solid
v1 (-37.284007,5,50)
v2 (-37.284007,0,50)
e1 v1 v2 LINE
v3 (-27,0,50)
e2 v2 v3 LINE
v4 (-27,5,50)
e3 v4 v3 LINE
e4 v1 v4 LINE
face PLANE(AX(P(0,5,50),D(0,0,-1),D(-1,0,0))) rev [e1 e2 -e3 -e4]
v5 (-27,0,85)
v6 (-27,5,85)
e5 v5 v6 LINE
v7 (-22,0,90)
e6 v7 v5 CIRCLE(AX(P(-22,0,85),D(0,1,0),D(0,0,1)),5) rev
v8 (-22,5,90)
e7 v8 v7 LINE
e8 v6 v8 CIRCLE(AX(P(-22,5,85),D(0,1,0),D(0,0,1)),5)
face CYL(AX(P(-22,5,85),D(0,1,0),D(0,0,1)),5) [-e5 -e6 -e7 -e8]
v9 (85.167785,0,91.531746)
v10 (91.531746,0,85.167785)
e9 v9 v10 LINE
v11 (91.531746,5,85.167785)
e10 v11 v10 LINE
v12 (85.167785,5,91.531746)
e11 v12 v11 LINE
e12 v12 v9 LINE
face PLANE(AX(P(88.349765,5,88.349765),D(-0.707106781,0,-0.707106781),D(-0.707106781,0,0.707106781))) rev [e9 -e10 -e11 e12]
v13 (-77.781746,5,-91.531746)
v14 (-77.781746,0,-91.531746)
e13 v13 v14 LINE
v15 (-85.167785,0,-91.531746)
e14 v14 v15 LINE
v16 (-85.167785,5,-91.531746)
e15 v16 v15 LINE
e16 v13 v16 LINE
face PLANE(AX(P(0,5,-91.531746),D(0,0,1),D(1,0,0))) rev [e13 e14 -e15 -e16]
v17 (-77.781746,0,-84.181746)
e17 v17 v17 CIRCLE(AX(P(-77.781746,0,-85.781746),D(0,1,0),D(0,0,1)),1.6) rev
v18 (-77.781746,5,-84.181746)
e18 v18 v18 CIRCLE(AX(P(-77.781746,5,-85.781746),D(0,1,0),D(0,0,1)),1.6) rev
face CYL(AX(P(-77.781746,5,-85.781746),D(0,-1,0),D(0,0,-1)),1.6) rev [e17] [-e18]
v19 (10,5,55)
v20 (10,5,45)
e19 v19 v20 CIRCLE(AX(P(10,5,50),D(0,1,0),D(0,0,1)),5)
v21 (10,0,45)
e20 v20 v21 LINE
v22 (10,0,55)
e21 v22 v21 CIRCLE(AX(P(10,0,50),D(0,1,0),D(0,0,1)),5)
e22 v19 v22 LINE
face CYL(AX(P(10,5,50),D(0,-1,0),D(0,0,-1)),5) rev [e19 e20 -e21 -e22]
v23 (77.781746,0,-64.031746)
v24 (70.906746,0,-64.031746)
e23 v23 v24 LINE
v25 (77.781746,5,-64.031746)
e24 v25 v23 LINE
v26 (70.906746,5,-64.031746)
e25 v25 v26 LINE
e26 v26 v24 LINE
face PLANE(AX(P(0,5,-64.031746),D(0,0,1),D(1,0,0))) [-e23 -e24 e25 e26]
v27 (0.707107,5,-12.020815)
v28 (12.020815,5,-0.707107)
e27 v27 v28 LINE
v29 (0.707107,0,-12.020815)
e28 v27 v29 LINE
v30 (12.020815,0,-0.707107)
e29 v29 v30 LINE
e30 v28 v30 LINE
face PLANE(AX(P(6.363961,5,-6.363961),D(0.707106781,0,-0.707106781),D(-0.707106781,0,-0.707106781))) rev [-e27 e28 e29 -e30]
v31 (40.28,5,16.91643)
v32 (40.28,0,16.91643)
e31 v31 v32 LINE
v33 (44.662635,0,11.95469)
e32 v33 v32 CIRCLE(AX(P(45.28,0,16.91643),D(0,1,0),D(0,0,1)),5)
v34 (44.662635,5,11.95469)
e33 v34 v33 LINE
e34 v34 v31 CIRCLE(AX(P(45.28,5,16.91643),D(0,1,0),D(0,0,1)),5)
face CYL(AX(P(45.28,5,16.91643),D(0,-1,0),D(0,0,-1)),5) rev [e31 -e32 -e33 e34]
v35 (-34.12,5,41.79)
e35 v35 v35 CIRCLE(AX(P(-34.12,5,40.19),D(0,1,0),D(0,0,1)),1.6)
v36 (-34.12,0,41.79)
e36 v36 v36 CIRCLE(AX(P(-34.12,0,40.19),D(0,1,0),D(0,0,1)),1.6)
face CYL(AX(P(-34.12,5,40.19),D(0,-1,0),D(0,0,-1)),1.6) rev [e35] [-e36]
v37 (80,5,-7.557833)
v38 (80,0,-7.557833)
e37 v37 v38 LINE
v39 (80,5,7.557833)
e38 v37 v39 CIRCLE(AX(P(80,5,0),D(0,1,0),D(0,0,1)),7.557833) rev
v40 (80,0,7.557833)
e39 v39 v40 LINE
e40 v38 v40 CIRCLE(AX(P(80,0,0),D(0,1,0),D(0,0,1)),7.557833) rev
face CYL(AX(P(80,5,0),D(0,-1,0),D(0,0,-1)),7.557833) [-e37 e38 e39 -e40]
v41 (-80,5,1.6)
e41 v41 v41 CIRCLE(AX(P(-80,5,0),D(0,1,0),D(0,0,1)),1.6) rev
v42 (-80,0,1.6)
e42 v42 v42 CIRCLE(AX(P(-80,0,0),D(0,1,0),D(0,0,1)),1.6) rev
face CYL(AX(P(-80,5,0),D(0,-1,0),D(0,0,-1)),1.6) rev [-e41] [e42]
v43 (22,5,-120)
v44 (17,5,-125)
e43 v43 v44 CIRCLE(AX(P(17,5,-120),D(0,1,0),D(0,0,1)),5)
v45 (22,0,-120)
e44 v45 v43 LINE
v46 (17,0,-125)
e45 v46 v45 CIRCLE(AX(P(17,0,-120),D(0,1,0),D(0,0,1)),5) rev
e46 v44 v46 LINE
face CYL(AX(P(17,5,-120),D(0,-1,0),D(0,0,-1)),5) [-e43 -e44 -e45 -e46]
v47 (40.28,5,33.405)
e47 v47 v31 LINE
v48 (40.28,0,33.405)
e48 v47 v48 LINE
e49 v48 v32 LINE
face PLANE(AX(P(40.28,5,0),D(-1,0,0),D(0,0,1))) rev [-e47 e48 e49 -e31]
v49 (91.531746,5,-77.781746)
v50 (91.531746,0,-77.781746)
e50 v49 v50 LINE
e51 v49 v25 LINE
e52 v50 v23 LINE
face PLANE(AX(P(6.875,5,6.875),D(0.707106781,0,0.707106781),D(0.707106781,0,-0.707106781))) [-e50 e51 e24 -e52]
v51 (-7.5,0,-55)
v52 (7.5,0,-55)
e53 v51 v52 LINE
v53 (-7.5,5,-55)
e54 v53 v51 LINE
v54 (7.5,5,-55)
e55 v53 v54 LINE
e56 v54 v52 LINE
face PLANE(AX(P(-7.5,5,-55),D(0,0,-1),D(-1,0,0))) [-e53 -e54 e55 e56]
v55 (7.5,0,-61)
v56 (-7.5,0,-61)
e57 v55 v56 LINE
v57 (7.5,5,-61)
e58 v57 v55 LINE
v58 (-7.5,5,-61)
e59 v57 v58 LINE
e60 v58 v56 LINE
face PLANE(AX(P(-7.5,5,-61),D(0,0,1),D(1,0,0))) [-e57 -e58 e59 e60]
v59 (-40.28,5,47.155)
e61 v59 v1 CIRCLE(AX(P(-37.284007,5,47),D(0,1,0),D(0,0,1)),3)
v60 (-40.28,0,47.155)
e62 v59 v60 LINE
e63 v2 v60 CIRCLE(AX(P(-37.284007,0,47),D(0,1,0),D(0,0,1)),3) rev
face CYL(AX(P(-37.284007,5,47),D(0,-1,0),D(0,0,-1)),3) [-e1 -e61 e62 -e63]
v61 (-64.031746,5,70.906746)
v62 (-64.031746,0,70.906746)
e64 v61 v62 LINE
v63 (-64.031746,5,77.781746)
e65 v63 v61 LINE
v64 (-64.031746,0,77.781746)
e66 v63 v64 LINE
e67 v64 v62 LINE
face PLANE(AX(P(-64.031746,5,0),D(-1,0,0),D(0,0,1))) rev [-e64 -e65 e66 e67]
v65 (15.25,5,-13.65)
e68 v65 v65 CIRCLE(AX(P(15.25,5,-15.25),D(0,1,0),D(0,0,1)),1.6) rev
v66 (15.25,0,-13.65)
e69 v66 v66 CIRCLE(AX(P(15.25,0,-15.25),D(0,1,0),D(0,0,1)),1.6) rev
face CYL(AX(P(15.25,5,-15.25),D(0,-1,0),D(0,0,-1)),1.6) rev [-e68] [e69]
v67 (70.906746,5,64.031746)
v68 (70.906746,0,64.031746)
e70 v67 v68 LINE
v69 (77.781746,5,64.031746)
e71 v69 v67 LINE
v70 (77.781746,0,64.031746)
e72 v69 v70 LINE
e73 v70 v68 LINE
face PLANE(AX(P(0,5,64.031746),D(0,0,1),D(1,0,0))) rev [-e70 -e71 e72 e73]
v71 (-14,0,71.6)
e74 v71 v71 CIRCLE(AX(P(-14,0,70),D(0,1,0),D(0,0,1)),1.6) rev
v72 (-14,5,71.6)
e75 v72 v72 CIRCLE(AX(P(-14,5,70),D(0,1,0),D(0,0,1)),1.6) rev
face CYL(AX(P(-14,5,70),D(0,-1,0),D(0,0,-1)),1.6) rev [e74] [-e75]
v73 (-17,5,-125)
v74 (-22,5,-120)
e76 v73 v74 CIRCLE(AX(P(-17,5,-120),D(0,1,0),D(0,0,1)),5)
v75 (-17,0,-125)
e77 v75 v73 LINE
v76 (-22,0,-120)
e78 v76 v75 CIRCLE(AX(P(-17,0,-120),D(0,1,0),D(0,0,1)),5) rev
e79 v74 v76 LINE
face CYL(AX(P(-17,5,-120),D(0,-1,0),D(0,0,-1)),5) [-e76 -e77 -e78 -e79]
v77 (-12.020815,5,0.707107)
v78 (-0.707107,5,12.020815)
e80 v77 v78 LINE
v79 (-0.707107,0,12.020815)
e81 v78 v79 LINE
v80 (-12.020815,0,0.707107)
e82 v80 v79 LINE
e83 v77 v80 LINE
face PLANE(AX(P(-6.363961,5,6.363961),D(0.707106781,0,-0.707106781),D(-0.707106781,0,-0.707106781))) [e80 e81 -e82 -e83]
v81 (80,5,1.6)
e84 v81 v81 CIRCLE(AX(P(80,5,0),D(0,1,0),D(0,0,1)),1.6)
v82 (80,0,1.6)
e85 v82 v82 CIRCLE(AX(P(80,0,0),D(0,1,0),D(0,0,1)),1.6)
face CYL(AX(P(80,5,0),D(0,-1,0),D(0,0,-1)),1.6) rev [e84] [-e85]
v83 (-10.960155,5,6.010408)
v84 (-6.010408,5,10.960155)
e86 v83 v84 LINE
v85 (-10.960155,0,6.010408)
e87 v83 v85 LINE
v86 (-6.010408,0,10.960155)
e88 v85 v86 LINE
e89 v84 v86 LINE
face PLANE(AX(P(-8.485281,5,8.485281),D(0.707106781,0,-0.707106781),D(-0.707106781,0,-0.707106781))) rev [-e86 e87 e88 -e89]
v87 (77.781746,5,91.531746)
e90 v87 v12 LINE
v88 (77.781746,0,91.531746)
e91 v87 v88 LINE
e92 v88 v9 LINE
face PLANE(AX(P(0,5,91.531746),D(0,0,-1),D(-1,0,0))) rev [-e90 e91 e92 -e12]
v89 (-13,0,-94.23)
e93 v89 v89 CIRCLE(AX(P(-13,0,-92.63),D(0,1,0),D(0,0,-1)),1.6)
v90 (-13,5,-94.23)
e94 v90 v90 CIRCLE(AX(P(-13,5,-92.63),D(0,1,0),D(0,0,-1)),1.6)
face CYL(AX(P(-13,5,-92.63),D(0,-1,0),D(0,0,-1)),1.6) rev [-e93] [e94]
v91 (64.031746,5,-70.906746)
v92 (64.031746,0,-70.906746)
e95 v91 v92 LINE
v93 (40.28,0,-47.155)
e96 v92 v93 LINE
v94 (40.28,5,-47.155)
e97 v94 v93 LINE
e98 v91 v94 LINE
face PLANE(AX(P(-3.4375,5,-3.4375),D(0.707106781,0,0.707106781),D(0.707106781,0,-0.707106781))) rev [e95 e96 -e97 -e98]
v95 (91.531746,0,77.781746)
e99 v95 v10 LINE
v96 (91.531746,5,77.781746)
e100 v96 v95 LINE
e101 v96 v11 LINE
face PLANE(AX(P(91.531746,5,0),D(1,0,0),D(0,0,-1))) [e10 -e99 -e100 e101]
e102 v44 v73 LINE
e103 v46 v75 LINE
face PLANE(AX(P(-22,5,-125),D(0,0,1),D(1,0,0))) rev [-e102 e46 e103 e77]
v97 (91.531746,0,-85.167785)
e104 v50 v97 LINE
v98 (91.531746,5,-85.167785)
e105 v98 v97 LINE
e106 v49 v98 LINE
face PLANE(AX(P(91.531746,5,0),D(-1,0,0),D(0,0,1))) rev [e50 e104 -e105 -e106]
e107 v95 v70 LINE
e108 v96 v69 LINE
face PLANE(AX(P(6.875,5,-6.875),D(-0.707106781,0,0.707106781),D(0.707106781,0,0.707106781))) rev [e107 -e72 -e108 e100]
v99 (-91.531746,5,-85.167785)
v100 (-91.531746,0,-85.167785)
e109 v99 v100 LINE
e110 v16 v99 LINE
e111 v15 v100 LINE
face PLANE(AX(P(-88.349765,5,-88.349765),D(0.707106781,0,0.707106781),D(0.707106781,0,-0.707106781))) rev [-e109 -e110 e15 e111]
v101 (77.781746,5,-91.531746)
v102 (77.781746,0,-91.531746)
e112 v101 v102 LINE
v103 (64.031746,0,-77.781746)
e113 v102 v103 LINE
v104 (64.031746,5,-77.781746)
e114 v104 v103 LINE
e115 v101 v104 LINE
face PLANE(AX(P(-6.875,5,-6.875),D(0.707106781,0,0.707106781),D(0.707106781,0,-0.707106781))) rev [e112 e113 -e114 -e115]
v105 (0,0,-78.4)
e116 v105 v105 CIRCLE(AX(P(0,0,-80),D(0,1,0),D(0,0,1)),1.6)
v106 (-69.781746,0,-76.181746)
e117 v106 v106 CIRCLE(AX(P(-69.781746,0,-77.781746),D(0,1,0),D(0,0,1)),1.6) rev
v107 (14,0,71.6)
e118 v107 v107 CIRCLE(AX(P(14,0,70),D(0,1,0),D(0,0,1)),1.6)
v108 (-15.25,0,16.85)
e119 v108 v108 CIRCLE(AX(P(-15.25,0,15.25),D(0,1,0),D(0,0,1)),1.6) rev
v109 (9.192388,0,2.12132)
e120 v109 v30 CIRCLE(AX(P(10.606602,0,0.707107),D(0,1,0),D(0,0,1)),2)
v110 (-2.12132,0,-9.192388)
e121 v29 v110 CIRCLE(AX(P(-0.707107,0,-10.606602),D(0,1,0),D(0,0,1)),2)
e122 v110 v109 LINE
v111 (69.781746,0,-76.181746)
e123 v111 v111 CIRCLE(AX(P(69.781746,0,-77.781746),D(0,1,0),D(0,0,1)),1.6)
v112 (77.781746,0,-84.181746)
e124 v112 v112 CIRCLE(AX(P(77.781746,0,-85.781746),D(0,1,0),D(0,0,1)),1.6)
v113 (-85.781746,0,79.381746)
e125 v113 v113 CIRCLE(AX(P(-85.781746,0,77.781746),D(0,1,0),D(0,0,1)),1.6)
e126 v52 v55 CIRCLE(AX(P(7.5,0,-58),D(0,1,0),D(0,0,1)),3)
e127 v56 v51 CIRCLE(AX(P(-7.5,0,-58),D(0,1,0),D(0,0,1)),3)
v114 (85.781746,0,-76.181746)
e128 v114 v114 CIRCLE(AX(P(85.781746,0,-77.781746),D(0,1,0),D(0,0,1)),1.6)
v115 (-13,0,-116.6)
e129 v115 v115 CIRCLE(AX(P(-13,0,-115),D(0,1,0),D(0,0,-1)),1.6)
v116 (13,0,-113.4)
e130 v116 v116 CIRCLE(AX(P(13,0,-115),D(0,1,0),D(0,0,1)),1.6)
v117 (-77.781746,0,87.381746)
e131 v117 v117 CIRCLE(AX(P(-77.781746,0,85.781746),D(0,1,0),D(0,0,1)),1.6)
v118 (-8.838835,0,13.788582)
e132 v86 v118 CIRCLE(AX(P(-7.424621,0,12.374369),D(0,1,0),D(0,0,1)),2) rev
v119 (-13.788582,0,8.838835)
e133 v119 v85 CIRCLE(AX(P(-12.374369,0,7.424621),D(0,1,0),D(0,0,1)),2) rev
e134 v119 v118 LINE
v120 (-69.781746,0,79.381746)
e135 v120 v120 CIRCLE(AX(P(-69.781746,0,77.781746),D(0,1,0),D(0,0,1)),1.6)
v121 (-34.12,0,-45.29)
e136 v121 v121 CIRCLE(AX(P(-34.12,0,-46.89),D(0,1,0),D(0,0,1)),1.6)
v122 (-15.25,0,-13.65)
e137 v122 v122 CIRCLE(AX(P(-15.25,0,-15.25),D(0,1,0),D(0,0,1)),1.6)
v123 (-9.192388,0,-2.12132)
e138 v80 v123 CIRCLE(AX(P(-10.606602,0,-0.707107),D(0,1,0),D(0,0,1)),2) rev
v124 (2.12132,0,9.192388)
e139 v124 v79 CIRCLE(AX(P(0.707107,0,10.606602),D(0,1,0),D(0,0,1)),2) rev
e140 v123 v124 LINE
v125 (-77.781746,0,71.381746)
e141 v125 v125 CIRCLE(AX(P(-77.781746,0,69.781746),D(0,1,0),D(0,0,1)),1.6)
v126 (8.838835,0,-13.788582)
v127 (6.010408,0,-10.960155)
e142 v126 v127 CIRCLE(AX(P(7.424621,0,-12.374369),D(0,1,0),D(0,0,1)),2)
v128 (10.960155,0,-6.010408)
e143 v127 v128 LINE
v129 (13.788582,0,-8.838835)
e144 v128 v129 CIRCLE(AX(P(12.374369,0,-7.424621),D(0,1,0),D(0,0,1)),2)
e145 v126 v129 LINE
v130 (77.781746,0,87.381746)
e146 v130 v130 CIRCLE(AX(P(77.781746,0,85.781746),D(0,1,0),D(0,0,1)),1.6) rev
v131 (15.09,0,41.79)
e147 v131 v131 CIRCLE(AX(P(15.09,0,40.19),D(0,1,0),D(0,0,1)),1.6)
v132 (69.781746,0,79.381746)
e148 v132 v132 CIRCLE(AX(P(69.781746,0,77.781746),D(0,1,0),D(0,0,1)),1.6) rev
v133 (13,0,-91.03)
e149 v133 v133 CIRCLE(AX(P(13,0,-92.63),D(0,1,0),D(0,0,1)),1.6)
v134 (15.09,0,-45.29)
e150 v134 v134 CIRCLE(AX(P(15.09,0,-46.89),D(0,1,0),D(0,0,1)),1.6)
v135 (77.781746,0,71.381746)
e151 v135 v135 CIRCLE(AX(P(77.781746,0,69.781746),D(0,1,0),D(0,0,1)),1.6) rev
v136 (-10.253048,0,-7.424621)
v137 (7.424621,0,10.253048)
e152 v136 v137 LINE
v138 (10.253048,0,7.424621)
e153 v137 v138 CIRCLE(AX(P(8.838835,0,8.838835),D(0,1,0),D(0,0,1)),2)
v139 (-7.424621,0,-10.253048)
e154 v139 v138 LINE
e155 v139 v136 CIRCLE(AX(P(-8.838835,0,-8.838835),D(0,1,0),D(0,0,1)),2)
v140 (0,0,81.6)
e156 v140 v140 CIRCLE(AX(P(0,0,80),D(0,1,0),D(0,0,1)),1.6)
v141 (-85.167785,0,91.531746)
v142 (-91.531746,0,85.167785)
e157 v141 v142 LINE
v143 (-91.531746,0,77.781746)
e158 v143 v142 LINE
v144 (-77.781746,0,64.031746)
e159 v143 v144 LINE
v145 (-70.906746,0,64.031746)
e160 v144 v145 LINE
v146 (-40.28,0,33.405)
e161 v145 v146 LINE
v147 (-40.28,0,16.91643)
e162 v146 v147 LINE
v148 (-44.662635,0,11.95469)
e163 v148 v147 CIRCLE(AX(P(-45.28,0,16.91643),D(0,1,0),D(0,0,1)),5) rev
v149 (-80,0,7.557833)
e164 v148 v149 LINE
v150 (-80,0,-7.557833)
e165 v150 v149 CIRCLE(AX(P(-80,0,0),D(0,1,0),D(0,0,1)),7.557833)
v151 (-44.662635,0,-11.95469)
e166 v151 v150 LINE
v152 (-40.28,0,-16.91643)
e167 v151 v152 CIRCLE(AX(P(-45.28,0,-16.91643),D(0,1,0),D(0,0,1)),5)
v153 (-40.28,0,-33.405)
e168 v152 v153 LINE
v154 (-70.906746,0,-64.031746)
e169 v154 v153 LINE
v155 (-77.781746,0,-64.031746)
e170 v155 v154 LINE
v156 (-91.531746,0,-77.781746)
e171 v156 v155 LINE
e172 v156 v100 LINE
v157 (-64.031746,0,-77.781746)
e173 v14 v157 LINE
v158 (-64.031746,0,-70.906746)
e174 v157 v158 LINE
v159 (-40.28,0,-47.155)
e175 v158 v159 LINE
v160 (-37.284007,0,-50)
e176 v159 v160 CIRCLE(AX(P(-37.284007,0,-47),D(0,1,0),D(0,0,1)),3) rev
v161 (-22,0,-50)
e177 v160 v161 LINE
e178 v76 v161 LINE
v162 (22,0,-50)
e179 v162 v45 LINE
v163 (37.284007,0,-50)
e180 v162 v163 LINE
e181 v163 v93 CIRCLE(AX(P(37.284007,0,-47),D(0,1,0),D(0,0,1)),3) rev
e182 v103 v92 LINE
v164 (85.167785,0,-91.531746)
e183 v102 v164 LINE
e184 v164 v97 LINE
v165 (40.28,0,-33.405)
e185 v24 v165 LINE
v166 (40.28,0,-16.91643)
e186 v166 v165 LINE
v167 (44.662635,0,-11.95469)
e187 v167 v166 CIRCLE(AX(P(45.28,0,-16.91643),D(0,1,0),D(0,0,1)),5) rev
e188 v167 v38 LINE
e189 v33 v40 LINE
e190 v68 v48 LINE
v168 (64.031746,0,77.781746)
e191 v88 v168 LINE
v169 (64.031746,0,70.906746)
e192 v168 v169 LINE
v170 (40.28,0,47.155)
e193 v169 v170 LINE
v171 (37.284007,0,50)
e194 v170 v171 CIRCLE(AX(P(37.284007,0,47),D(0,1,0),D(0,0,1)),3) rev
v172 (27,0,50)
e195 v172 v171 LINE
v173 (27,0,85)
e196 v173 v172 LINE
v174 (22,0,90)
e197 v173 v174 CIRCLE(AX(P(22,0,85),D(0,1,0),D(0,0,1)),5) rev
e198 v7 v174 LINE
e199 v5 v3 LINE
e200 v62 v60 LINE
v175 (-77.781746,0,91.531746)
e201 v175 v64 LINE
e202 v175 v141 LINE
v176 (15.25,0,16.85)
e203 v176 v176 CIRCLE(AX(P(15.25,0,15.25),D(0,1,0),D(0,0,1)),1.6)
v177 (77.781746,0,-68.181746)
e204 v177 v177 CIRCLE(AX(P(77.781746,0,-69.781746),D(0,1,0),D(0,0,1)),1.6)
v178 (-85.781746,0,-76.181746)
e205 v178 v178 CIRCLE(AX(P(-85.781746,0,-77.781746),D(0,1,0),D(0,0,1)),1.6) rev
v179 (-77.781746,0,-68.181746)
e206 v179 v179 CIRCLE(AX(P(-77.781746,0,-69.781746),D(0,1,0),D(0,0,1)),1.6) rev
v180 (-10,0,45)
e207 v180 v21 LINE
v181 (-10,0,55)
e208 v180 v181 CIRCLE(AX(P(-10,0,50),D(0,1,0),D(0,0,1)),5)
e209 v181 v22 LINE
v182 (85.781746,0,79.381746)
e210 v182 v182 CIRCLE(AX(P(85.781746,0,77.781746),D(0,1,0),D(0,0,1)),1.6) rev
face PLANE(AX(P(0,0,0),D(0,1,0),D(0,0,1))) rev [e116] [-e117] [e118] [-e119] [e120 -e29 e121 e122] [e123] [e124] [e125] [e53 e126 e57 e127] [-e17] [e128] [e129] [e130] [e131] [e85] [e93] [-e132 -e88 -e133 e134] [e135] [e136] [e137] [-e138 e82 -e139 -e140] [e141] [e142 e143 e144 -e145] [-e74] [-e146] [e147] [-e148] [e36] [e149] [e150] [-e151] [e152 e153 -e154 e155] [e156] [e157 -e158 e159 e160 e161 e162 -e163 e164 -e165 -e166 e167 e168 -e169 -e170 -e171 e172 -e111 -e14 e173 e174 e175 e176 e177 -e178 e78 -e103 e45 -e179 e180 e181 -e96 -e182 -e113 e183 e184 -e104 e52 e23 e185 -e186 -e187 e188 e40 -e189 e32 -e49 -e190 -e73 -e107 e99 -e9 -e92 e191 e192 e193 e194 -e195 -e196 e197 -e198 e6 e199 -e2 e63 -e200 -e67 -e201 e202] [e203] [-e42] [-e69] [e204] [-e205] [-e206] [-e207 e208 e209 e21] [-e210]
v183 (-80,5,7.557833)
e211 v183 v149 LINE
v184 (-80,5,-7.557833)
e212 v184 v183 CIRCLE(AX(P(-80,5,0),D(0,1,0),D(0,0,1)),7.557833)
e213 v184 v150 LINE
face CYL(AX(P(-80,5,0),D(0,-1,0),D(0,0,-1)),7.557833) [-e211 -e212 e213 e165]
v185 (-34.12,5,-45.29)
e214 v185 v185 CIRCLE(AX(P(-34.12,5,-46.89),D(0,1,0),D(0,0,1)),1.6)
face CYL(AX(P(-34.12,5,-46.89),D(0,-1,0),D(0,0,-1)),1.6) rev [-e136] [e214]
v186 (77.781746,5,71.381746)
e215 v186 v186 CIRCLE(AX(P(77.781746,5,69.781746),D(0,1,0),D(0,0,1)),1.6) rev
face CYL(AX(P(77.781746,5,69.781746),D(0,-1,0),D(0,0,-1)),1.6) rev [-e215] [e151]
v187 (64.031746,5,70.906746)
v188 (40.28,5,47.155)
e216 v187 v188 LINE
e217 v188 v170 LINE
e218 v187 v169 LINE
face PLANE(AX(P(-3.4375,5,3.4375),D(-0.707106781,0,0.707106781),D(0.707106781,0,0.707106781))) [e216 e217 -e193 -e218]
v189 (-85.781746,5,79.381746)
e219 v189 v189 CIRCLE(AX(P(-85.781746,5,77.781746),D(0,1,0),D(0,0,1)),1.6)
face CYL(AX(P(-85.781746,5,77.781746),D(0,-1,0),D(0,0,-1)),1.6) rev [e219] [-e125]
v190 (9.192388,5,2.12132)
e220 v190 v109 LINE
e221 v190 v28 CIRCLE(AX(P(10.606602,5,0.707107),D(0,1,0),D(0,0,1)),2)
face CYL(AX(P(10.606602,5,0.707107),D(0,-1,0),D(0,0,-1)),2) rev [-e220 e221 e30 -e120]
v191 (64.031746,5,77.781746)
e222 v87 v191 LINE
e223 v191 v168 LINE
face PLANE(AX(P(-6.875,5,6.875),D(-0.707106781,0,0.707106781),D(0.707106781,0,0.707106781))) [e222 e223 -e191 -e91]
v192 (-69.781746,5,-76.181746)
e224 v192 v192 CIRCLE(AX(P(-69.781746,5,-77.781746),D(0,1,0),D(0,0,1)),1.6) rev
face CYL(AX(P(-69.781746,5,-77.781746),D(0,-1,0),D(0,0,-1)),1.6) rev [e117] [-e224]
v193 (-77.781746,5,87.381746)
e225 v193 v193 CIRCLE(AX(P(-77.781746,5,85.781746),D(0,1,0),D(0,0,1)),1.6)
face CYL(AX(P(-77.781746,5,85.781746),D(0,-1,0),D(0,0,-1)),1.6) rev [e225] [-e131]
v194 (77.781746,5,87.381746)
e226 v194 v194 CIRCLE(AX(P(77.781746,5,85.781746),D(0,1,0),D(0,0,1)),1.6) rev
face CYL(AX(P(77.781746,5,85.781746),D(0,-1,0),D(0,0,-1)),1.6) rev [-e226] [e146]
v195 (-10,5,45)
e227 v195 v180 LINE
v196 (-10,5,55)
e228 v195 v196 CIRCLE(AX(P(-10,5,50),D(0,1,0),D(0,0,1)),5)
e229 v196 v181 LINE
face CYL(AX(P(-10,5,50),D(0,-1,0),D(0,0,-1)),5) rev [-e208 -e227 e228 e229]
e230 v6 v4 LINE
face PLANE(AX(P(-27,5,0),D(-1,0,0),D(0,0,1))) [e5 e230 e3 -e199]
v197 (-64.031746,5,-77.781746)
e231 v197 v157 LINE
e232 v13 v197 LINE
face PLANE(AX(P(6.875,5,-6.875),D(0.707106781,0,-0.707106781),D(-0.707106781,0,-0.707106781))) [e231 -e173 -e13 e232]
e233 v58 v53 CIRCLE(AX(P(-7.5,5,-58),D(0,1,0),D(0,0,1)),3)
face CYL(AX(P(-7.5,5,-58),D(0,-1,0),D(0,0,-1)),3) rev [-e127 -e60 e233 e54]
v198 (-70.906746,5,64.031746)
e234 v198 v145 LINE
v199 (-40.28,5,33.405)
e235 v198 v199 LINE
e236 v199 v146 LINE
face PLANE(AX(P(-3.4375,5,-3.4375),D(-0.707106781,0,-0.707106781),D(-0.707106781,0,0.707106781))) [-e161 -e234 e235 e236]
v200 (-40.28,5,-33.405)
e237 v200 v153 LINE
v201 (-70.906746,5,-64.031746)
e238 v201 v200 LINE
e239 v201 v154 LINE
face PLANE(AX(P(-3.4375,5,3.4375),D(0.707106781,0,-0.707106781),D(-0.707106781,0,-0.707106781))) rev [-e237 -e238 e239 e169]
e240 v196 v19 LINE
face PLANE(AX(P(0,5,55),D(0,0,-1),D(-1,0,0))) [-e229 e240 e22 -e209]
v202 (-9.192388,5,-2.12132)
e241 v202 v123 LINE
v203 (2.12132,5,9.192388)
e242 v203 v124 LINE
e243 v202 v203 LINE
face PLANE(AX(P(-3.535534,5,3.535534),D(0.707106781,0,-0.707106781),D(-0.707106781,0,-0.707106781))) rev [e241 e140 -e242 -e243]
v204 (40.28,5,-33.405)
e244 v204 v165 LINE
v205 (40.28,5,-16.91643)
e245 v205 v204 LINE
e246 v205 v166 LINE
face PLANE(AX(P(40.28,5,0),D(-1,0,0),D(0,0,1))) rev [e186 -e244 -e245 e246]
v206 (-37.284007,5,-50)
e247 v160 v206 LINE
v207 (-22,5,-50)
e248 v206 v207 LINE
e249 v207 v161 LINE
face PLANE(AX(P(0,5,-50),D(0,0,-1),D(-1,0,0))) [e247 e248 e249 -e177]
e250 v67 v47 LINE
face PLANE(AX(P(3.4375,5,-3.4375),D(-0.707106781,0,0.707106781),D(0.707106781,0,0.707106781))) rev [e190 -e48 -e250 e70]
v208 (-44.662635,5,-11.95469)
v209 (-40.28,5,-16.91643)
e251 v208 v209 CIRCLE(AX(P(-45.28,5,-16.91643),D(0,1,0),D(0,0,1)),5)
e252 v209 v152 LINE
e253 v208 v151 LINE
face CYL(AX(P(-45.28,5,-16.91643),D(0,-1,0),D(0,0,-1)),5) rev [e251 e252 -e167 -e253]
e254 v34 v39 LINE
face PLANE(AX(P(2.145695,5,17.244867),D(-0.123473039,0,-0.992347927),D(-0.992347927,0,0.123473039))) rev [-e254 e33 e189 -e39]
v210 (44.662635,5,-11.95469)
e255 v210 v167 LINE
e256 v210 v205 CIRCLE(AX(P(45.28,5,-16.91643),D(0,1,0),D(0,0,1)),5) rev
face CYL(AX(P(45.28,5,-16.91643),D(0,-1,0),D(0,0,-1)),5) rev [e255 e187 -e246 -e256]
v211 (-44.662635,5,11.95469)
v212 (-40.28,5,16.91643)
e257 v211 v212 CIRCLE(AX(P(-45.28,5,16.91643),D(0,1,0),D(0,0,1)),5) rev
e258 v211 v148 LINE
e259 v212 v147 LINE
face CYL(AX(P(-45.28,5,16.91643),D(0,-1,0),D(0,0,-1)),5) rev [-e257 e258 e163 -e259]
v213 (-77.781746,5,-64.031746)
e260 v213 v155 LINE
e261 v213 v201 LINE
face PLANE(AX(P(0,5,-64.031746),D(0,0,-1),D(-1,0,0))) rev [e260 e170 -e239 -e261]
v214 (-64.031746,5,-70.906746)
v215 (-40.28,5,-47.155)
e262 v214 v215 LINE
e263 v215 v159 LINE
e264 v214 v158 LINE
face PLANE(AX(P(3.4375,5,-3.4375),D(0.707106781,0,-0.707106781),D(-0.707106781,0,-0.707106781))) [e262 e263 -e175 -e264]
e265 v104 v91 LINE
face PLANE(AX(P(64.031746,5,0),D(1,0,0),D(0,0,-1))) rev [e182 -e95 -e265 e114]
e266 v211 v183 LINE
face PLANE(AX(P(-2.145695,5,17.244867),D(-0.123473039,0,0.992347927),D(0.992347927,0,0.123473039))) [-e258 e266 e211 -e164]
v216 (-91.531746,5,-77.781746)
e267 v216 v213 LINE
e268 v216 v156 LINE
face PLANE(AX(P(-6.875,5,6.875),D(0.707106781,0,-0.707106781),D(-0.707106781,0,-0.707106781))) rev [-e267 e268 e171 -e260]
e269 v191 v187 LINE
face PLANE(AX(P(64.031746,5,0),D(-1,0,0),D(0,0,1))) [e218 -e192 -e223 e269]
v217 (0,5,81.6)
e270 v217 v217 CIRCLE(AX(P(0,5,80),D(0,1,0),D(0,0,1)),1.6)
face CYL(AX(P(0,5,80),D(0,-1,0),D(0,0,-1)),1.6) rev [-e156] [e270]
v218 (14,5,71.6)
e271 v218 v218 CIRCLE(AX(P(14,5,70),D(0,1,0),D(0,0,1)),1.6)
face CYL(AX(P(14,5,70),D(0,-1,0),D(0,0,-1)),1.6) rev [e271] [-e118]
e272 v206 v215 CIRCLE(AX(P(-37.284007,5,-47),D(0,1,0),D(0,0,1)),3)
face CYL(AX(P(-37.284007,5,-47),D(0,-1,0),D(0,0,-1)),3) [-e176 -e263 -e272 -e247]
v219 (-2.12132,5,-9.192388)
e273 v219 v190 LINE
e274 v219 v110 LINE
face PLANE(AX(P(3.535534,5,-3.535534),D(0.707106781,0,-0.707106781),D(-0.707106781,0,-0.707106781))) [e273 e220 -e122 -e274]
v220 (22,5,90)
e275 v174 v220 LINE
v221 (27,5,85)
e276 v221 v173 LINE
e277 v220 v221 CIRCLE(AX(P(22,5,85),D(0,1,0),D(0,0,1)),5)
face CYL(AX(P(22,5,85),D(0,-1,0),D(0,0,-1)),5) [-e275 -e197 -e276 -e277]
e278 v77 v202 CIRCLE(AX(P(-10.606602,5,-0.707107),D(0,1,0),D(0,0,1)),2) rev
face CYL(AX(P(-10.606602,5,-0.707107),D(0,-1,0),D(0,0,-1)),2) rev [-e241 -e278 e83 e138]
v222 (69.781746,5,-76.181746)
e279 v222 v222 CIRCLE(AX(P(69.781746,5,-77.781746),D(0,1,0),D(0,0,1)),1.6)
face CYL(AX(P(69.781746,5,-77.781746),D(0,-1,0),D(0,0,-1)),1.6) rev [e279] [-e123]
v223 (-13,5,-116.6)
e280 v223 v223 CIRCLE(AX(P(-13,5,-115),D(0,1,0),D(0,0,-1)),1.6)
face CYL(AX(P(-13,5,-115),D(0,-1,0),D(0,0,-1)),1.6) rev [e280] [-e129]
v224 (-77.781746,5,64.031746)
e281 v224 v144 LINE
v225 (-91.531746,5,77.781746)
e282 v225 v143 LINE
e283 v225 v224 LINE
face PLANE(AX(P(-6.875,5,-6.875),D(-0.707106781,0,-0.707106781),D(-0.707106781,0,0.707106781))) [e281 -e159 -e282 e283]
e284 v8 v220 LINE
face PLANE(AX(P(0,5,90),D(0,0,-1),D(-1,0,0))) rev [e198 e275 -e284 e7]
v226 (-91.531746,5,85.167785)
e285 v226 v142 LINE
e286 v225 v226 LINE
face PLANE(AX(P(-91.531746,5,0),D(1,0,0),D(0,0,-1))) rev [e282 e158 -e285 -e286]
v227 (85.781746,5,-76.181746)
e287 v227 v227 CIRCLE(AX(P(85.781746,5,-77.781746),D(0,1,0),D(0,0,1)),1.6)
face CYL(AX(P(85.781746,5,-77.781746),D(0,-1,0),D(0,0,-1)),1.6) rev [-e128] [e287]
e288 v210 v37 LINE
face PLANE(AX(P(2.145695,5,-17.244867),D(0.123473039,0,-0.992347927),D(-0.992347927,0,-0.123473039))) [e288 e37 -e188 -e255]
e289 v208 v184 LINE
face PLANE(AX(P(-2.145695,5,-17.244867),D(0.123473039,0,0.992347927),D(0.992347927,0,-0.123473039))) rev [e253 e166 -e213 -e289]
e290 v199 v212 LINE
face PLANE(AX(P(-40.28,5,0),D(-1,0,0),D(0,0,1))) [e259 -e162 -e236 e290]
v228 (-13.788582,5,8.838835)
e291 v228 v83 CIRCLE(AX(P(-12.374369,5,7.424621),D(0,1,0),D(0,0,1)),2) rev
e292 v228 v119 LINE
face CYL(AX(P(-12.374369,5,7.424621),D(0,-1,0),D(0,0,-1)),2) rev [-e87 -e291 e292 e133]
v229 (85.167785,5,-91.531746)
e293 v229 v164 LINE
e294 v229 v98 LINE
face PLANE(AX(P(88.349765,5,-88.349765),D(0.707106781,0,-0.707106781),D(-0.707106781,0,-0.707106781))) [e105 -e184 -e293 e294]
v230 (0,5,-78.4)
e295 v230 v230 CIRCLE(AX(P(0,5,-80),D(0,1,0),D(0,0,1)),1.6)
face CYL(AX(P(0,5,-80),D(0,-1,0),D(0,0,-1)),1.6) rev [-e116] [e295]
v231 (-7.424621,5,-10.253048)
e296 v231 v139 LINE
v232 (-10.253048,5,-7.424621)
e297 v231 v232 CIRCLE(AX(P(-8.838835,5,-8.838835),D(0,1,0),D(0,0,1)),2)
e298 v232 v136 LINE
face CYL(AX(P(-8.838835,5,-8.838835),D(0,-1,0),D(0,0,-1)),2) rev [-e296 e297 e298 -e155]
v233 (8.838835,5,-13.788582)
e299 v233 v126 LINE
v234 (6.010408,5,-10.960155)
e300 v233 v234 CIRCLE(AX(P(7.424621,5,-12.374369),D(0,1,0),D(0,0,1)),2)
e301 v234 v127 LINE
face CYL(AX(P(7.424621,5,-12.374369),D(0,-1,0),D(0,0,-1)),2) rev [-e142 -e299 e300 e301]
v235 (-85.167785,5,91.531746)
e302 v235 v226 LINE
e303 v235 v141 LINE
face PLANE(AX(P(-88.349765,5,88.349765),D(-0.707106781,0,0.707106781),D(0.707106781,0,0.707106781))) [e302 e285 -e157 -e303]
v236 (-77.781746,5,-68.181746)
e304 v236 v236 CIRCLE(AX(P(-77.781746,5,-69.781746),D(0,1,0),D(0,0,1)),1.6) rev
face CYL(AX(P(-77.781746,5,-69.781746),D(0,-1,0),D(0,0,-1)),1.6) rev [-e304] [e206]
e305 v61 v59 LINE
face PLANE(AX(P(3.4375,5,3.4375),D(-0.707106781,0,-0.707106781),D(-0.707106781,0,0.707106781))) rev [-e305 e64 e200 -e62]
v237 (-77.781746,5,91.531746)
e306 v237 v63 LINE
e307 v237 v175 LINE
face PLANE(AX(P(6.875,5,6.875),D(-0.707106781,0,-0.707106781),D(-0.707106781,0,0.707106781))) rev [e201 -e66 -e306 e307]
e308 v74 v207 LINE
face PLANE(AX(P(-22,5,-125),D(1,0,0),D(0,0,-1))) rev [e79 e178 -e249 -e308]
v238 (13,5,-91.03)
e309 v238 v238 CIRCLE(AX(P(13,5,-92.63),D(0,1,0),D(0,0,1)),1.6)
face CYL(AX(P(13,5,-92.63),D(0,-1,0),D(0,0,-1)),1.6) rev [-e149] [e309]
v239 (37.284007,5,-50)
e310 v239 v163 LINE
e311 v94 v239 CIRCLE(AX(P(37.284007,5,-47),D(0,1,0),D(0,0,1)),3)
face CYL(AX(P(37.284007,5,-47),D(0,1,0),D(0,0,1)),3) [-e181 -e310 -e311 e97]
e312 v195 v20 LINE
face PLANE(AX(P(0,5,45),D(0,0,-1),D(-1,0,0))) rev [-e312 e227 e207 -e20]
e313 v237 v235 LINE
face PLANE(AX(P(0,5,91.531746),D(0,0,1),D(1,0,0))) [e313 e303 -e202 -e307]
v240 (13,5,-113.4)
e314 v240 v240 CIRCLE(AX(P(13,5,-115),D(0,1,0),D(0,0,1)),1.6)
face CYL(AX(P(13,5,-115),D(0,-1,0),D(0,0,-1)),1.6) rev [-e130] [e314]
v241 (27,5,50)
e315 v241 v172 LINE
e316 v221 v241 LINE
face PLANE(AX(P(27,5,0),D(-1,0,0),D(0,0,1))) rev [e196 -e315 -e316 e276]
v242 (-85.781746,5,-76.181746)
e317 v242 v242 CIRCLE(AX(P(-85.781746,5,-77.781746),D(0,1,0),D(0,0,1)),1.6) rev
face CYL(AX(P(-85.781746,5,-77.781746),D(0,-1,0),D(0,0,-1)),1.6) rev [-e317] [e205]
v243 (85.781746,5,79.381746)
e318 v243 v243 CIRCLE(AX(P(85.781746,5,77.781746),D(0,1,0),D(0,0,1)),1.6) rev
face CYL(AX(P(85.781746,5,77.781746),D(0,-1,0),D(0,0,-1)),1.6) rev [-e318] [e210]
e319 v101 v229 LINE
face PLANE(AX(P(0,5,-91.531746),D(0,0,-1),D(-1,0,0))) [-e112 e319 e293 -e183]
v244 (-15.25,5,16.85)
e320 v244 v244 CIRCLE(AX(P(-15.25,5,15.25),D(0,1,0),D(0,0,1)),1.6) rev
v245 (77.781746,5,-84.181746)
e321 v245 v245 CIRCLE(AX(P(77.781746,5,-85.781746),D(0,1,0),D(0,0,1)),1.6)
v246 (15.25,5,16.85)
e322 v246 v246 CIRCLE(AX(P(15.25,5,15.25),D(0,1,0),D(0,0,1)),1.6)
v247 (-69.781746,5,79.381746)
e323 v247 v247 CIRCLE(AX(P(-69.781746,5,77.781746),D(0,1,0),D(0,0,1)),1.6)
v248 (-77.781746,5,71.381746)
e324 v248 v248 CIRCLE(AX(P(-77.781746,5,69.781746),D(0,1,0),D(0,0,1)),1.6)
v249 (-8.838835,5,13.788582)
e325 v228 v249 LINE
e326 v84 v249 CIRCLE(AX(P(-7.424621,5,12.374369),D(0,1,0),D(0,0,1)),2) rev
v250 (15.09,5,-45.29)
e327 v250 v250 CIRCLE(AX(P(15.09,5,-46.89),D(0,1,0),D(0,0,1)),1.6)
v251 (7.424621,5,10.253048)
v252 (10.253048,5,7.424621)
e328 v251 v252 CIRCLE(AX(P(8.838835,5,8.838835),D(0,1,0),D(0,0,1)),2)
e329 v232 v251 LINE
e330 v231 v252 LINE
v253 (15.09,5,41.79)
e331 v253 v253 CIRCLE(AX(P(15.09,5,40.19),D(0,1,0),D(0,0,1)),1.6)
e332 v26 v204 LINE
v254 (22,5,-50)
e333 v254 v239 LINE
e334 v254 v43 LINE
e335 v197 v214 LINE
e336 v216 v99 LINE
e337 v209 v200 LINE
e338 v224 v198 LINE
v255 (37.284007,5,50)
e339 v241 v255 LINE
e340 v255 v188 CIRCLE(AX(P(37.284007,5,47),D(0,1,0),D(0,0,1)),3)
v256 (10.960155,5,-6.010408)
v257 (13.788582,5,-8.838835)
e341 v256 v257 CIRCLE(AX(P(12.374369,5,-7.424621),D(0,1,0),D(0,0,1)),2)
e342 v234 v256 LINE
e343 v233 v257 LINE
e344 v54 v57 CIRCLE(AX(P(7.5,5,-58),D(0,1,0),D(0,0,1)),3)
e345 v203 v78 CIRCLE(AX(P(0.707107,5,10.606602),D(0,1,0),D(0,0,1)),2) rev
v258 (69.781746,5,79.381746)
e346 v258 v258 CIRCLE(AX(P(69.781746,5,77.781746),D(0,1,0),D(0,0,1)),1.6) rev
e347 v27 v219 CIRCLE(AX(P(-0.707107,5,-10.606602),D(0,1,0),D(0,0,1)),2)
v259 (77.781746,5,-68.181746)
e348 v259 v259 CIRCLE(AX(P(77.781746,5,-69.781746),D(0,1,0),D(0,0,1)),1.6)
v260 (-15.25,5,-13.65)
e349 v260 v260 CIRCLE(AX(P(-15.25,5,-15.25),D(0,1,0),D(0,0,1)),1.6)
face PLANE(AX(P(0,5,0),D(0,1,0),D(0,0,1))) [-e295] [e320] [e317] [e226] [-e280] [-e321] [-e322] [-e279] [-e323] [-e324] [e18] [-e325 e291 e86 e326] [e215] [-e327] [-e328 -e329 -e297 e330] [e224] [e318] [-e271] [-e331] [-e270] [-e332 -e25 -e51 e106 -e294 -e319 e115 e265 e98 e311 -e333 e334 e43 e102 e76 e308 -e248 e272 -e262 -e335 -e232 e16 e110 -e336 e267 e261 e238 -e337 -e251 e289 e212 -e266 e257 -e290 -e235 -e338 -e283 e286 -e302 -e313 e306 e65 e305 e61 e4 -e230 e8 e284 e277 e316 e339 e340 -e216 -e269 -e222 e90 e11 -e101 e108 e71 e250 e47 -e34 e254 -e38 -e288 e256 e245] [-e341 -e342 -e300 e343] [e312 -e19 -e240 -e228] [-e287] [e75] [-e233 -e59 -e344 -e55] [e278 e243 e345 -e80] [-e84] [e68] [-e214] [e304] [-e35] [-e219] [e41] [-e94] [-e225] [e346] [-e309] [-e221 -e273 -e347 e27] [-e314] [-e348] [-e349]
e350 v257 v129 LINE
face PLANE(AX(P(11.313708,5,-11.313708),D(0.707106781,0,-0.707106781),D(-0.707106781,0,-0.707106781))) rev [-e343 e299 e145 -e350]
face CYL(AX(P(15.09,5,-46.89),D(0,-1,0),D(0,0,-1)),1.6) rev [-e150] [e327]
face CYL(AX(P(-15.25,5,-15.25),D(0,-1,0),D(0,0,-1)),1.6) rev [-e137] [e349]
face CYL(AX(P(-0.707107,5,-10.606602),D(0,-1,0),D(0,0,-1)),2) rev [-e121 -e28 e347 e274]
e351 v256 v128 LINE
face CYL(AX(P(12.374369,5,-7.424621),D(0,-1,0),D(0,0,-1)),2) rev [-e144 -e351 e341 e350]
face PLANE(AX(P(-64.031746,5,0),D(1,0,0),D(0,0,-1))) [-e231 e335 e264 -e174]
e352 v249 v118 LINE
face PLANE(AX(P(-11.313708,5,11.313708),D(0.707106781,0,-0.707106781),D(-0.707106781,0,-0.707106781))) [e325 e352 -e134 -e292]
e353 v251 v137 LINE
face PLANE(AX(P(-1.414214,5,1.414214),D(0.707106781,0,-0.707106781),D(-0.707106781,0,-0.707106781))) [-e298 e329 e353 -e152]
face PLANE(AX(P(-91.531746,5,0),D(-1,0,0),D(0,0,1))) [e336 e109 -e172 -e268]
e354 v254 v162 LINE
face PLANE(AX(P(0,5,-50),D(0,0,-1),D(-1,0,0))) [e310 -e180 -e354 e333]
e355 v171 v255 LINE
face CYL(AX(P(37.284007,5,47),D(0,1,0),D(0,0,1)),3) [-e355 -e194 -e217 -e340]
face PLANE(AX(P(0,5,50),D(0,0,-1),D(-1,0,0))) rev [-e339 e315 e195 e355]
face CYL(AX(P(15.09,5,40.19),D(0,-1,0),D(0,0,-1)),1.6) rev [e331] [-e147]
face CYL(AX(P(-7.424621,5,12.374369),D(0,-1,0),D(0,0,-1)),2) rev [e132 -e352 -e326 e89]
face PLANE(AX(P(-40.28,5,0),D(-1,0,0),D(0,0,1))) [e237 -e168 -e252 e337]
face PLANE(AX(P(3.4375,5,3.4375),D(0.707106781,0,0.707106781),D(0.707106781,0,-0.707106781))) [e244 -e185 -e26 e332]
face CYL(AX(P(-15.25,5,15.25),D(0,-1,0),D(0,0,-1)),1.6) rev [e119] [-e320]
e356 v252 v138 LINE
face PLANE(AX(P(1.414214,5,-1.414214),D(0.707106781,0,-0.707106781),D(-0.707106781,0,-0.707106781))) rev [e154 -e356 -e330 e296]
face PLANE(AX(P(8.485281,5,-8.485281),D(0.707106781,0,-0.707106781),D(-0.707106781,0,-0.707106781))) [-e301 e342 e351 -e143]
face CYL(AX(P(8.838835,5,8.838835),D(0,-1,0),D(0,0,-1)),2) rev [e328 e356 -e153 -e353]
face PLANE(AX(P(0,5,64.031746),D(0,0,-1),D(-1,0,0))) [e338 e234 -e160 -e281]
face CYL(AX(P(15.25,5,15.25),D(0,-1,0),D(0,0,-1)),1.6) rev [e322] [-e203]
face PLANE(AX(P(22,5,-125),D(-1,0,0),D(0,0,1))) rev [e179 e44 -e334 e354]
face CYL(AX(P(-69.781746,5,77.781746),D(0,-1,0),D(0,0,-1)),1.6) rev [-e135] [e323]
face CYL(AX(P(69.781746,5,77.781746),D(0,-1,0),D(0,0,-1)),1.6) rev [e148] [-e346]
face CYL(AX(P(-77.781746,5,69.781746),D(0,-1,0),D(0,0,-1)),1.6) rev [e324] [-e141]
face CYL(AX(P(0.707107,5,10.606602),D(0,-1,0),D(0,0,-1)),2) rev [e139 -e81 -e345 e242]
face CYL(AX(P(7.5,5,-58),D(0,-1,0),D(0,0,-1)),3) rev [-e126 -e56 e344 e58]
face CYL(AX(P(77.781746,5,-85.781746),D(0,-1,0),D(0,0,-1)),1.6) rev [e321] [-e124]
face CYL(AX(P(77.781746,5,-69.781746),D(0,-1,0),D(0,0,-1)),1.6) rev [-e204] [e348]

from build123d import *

# Parameters (mm, degrees)
SKETCH_1_R          = 1.6
EXTRUDE_1_DEPTH     = 5
SKETCH_6_R          = 1.6
EXTRUDE_3_DEPTH     = 5
SKETCH_7_R          = 1.6
CUT_EXTRUDE_5_DEPTH = 130.541966274
SKETCH_8_W          = 44
SKETCH_8_H          = 75
SKETCH_8_R          = 1.6
EXTRUDE_4_DEPTH     = 5
FILLET_1_R          = 5
FILLET_2_R          = 3


with BuildPart() as part:
    # 草图1 → 凸台-拉伸1 (new body)
    with BuildSketch(Plane(origin=(0, 0, 0), x_dir=(1, 0, 0), z_dir=(0, 1, 0))):
        with BuildLine():
            Line((-40.28, -16.916429648), (-40.28, -50))
            Line((-40.28, -50), (-27, -50))
            Line((-27, -50), (-27, -90))
            Line((-27, -90), (27, -90))
            Line((27, -90), (27, -50))
            Line((27, -50), (40.28, -50))
            Line((40.28, -50), (40.28, -16.916429648))
            ThreePointArc((40.28, -16.916429648), (41.5325458, -13.606356081), (44.662634807, -11.954690012))
            Line((44.662634807, -11.954690012), (80, -7.557833088))
            ThreePointArc((80, -7.557833088), (87.557833088, 0), (80, 7.557833088))
            Line((80, 7.557833088), (44.662634807, 11.954690012))
            ThreePointArc((44.662634807, 11.954690012), (41.5325458, 13.606356081), (40.28, 16.916429648))
            Line((40.28, 16.916429648), (40.28, 50))
            Line((40.28, 50), (-40.28, 50))
            Line((-40.28, 50), (-40.28, 16.916429648))
            ThreePointArc((-40.28, 16.916429648), (-41.5325458, 13.606356081), (-44.662634807, 11.954690012))
            Line((-44.662634807, 11.954690012), (-80, 7.557833088))
            ThreePointArc((-80, 7.557833088), (-87.557833088, 0), (-80, -7.557833088))
            Line((-80, -7.557833088), (-44.662634807, -11.954690012))
            ThreePointArc((-44.662634807, -11.954690012), (-41.5325458, -13.606356081), (-40.28, -16.916429648))
        make_face()
        with Locations(Location((-34.12, -40.19, 0), (0, 0, 270))):
            Circle(SKETCH_1_R, mode=Mode.SUBTRACT)
        with Locations(Location((15.09, -40.19, 0), (0, 0, 270))):
            Circle(SKETCH_1_R, mode=Mode.SUBTRACT)
        with Locations(Location((-80, 0, 0), (0, 0, 270))):
            Circle(SKETCH_1_R, mode=Mode.SUBTRACT)
        with Locations(Location((-15.25, -15.25, 0), (0, 0, 270))):
            Circle(SKETCH_1_R, mode=Mode.SUBTRACT)
        with Locations(Location((-15.25, 15.25, 0), (0, 0, 270))):
            Circle(SKETCH_1_R, mode=Mode.SUBTRACT)
        with Locations(Location((-34.12, 46.89, 0), (0, 0, 270))):
            Circle(SKETCH_1_R, mode=Mode.SUBTRACT)
        with Locations(Location((15.25, -15.25, 0), (0, 0, 270))):
            Circle(SKETCH_1_R, mode=Mode.SUBTRACT)
        with Locations(Location((80, 0, 0), (0, 0, 270))):
            Circle(SKETCH_1_R, mode=Mode.SUBTRACT)
        with Locations(Location((15.25, 15.25, 0), (0, 0, 270))):
            Circle(SKETCH_1_R, mode=Mode.SUBTRACT)
        with Locations(Location((15.09, 46.89, 0), (0, 0, 270))):
            Circle(SKETCH_1_R, mode=Mode.SUBTRACT)
        with Locations(Location((14, -70, 0), (0, 0, 270))):
            Circle(SKETCH_1_R, mode=Mode.SUBTRACT)
        with Locations(Location((-14, -70, 0), (0, 0, 270))):
            Circle(SKETCH_1_R, mode=Mode.SUBTRACT)
    extrude(amount=EXTRUDE_1_DEPTH)

    # 草图6 → 凸台-拉伸3 (add)
    # profile 1 of 4: a face of its own
    with BuildSketch(Plane(origin=(0, 0, 0), x_dir=(1, 0, 0), z_dir=(0, 1, 0))):
        Polygon((-40.28, 33.405), (-40.28, 47.155), (-64.031745931, 70.906745931), (-64.031745931, 77.781745931), (-77.781745931, 91.531745931), (-85.1677849, 91.531745931), (-91.531745931, 85.1677849), (-91.531745931, 77.781745931), (-77.781745931, 64.031745931), (-70.906745931, 64.031745931), align=None)
        with Locations(Location((-85.781745931, 77.781745931, 0), (0, 0, 270))):
            Circle(SKETCH_6_R, mode=Mode.SUBTRACT)
        with Locations(Location((-77.781745931, 69.781745931, 0), (0, 0, 270))):
            Circle(SKETCH_6_R, mode=Mode.SUBTRACT)
        with Locations(Location((-69.781745931, 77.781745931, 0), (0, 0, 270))):
            Circle(SKETCH_6_R, mode=Mode.SUBTRACT)
        with Locations(Location((-77.781745931, 85.781745931, 0), (0, 0, 270))):
            Circle(SKETCH_6_R, mode=Mode.SUBTRACT)
    # profile 2 of 4: a face of its own
    with BuildSketch(Plane(origin=(0, 0, 0), x_dir=(1, 0, 0), z_dir=(0, 1, 0))):
        Polygon((85.1677849, 91.531745931), (77.781745931, 91.531745931), (64.031745931, 77.781745931), (64.031745931, 70.906745931), (40.28, 47.155), (40.28, 33.405), (70.906745931, 64.031745931), (77.781745931, 64.031745931), (91.531745931, 77.781745931), (91.531745931, 85.1677849), align=None)
        with Locations(Location((77.781745931, 69.781745931, 0), (0, 0, 270))):
            Circle(SKETCH_6_R, mode=Mode.SUBTRACT)
        with Locations(Location((69.781745931, 77.781745931, 0), (0, 0, 270))):
            Circle(SKETCH_6_R, mode=Mode.SUBTRACT)
        with Locations(Location((85.781745931, 77.781745931, 0), (0, 0, 270))):
            Circle(SKETCH_6_R, mode=Mode.SUBTRACT)
        with Locations(Location((77.781745931, 85.781745931, 0), (0, 0, 270))):
            Circle(SKETCH_6_R, mode=Mode.SUBTRACT)
    # profile 3 of 4: a face of its own
    with BuildSketch(Plane(origin=(0, 0, 0), x_dir=(1, 0, 0), z_dir=(0, 1, 0))):
        Polygon((70.906745931, -64.031745931), (40.28, -33.405), (40.28, -47.155), (64.031745931, -70.906745931), (64.031745931, -77.781745931), (77.781745931, -91.531745931), (85.1677849, -91.531745931), (91.531745931, -85.1677849), (91.531745931, -77.781745931), (77.781745931, -64.031745931), align=None)
        with Locations(Location((77.781745931, -85.781745931, 0), (0, 0, 270))):
            Circle(SKETCH_6_R, mode=Mode.SUBTRACT)
        with Locations(Location((69.781745931, -77.781745931, 0), (0, 0, 270))):
            Circle(SKETCH_6_R, mode=Mode.SUBTRACT)
        with Locations(Location((77.781745931, -69.781745931, 0), (0, 0, 270))):
            Circle(SKETCH_6_R, mode=Mode.SUBTRACT)
        with Locations(Location((85.781745931, -77.781745931, 0), (0, 0, 270))):
            Circle(SKETCH_6_R, mode=Mode.SUBTRACT)
    # profile 4 of 4: a face of its own
    with BuildSketch(Plane(origin=(0, 0, 0), x_dir=(1, 0, 0), z_dir=(0, 1, 0))):
        Polygon((-40.28, -47.155), (-40.28, -33.405), (-70.906745931, -64.031745931), (-77.781745931, -64.031745931), (-91.531745931, -77.781745931), (-91.531745931, -85.1677849), (-85.1677849, -91.531745931), (-77.781745931, -91.531745931), (-64.031745931, -77.781745931), (-64.031745931, -70.906745931), align=None)
        with Locations(Location((-77.781745931, -85.781745931, 0), (0, 0, 270))):
            Circle(SKETCH_6_R, mode=Mode.SUBTRACT)
        with Locations(Location((-85.781745931, -77.781745931, 0), (0, 0, 270))):
            Circle(SKETCH_6_R, mode=Mode.SUBTRACT)
        with Locations(Location((-69.781745931, -77.781745931, 0), (0, 0, 270))):
            Circle(SKETCH_6_R, mode=Mode.SUBTRACT)
        with Locations(Location((-77.781745931, -69.781745931, 0), (0, 0, 270))):
            Circle(SKETCH_6_R, mode=Mode.SUBTRACT)
    extrude(amount=EXTRUDE_3_DEPTH)

    # 草图7 → 切除-拉伸5 (cut, through all)
    with BuildSketch(Plane(origin=(0, 0, 0), x_dir=(1, 0, 0), z_dir=(0, 1, 0))):
        with BuildLine():
            ThreePointArc((-6.01040764, -10.960155108), (-6.01040764, -13.788582233), (-8.838834765, -13.788582233))
            Line((-8.838834765, -13.788582233), (-13.788582233, -8.838834765))
            ThreePointArc((-13.788582233, -8.838834765), (-13.788582233, -6.01040764), (-10.960155108, -6.01040764))
            Line((-10.960155108, -6.01040764), (-6.01040764, -10.960155108))
        make_face()
        with BuildLine():
            ThreePointArc((2.121320344, -9.192388155), (2.121320344, -12.02081528), (-0.707106781, -12.02081528))
            Line((-0.707106781, -12.02081528), (-12.02081528, -0.707106781))
            ThreePointArc((-12.02081528, -0.707106781), (-12.02081528, 2.121320344), (-9.192388155, 2.121320344))
            Line((-9.192388155, 2.121320344), (2.121320344, -9.192388155))
        make_face()
        with BuildLine():
            Line((-10.253048327, 7.424621202), (7.424621202, -10.253048327))
            ThreePointArc((7.424621202, -10.253048327), (10.253048327, -10.253048327), (10.253048327, -7.424621202))
            Line((10.253048327, -7.424621202), (-7.424621202, 10.253048327))
            ThreePointArc((-7.424621202, 10.253048327), (-10.253048327, 10.253048327), (-10.253048327, 7.424621202))
        make_face()
        with BuildLine():
            Line((-2.121320344, 9.192388155), (9.192388155, -2.121320344))
            ThreePointArc((9.192388155, -2.121320344), (12.02081528, -2.121320344), (12.02081528, 0.707106781))
            Line((12.02081528, 0.707106781), (0.707106781, 12.02081528))
            ThreePointArc((0.707106781, 12.02081528), (-2.121320344, 12.02081528), (-2.121320344, 9.192388155))
        make_face()
        with BuildLine():
            Line((6.01040764, 10.960155108), (10.960155108, 6.01040764))
            ThreePointArc((10.960155108, 6.01040764), (13.788582233, 6.01040764), (13.788582233, 8.838834765))
            Line((13.788582233, 8.838834765), (8.838834765, 13.788582233))
            ThreePointArc((8.838834765, 13.788582233), (6.01040764, 13.788582233), (6.01040764, 10.960155108))
        make_face()
        with BuildLine():
            Line((-10, -55), (10, -55))
            ThreePointArc((10, -55), (15, -50), (10, -45))
            Line((10, -45), (-10, -45))
            ThreePointArc((-10, -45), (-15, -50), (-10, -55))
        make_face()
        with Locations(Location((0, -80, 0), (0, 0, 270))):
            Circle(SKETCH_7_R)
    extrude(amount=CUT_EXTRUDE_5_DEPTH, mode=Mode.SUBTRACT)

    # 草图8 → 凸台-拉伸4 (add)
    with BuildSketch(Plane(origin=(0, 0, 0), x_dir=(1, 0, 0), z_dir=(0, 1, 0))):
        with Locations((0, 87.5)):
            Rectangle(SKETCH_8_W, SKETCH_8_H)
        with Locations(Location((13, 115, 0), (0, 0, 270))):
            Circle(SKETCH_8_R, mode=Mode.SUBTRACT)
        with Locations(Location((-13, 115, 0), (0, 0, 90))):
            Circle(SKETCH_8_R, mode=Mode.SUBTRACT)
        with Locations(Location((13, 92.63, 0), (0, 0, 270))):
            Circle(SKETCH_8_R, mode=Mode.SUBTRACT)
        with Locations(Location((-13, 92.63, 0), (0, 0, 90))):
            Circle(SKETCH_8_R, mode=Mode.SUBTRACT)
        with Locations(Location((0, 80, 0), (0, 0, 270))):
            Circle(SKETCH_8_R, mode=Mode.SUBTRACT)
        with BuildLine():
            Line((-7.5, 61), (7.5, 61))
            ThreePointArc((7.5, 61), (10.5, 58), (7.5, 55))
            Line((7.5, 55), (-7.5, 55))
            ThreePointArc((-7.5, 55), (-10.5, 58), (-7.5, 61))
        make_face(mode=Mode.SUBTRACT)
    extrude(amount=EXTRUDE_4_DEPTH)

    # 圆角1
    fillet_1_edges = [part.edges().sort_by_distance(p)[0] for p in [
        (22, 2.5, -125),
        (-22, 2.5, -125),
        (27, 2.5, 90),
        (-27, 2.5, 90),
    ]]
    fillet(fillet_1_edges, radius=FILLET_1_R)

    # 圆角2
    # the kernel refuses this fillet: 3 mm, written as the material it takes off along each edge
    with BuildSketch(Plane(origin=(-40.28, -7.489982894, 50), x_dir=(1, 0, 0), z_dir=(0, 1, 0))) as fillet_2_piece_1_section:
        with BuildLine():
            CenterArc((2.995993158, 3), FILLET_2_R, 182.961600578, 87.038399422)
            Line((0, 2.845), (-0.059919863, 2.8419))
            ThreePointArc((-0.059919863, 2.8419), (-0.06, 1.4225), (-0.06, 0))
            Line((-0.06, 0), (0, -0.06))
            Line((0, -0.06), (2.995993158, -0.06))
            Line((2.995993158, -0.06), (2.995993158, 0))
        make_face()
    fillet_2_piece_1 = extrude(amount=19.979965788, mode=Mode.PRIVATE)
    fillet_2_piece_1 = split(fillet_2_piece_1, bisect_by=Plane(origin=(-41.028477844, 2.5, 47.903477844), z_dir=(0.7071067811865611, 0, 0.7071067811865339)), keep=Keep.TOP, mode=Mode.PRIVATE)
    add(fillet_2_piece_1, mode=Mode.SUBTRACT)
    with BuildSketch(Plane(origin=(40.28, -7.489982894, 50), x_dir=(-1, 0, 0), z_dir=(0, 1, 0))) as fillet_2_piece_2_section:
        with BuildLine():
            CenterArc((2.995993158, -3), FILLET_2_R, 90, 87.038399422)
            Line((0, -2.845), (-0.059919863, -2.8419))
            ThreePointArc((-0.059919863, -2.8419), (-0.06, -1.4225), (-0.06, 0))
            Line((-0.06, 0), (0, 0.06))
            Line((0, 0.06), (2.995993158, 0.06))
            Line((2.995993158, 0.06), (2.995993158, 0))
        make_face()
    fillet_2_piece_2 = extrude(amount=19.979965788, mode=Mode.PRIVATE)
    fillet_2_piece_2 = split(fillet_2_piece_2, bisect_by=Plane(origin=(41.028477844, 2.5, 47.903477844), z_dir=(-0.7071067811865506, 0, 0.7071067811865445)), keep=Keep.TOP, mode=Mode.PRIVATE)
    add(fillet_2_piece_2, mode=Mode.SUBTRACT)
    with BuildSketch(Plane(origin=(40.28, -7.489982894, -50), x_dir=(0, 0, 1), z_dir=(0, 1, 0))) as fillet_2_piece_3_section:
        with BuildLine():
            CenterArc((3, -2.995993158), FILLET_2_R, 92.961600577, 87.038399423)
            Line((0, -2.995993158), (-0.06, -2.995993158))
            Line((-0.06, -2.995993158), (-0.06, 0))
            Line((-0.06, 0), (0, 0.06))
            ThreePointArc((0, 0.06), (1.4225, 0.06), (2.8419, 0.059919863))
            Line((2.8419, 0.059919863), (2.845, 0))
        make_face()
    fillet_2_piece_3 = extrude(amount=19.979965788, mode=Mode.PRIVATE)
    fillet_2_piece_3 = split(fillet_2_piece_3, bisect_by=Plane(origin=(41.028477844, 2.5, -47.903477844), z_dir=(-0.7071067811865489, 0, -0.7071067811865461)), keep=Keep.TOP, mode=Mode.PRIVATE)
    add(fillet_2_piece_3, mode=Mode.SUBTRACT)
    with BuildSketch(Plane(origin=(-40.28, -7.489982894, -50), x_dir=(0, 0, 1), z_dir=(0, 1, 0))) as fillet_2_piece_4_section:
        with BuildLine():
            CenterArc((3, 2.995993158), FILLET_2_R, 180, 87.038399422)
            Line((0, 2.995993158), (-0.06, 2.995993158))
            Line((-0.06, 2.995993158), (-0.06, 0))
            Line((-0.06, 0), (0, -0.06))
            ThreePointArc((0, -0.06), (1.4225, -0.06), (2.8419, -0.059919863))
            Line((2.8419, -0.059919863), (2.845, 0))
        make_face()
    fillet_2_piece_4 = extrude(amount=19.979965788, mode=Mode.PRIVATE)
    fillet_2_piece_4 = split(fillet_2_piece_4, bisect_by=Plane(origin=(-41.028477844, 2.5, -47.903477844), z_dir=(0.7071067811865613, 0, -0.7071067811865338)), keep=Keep.TOP, mode=Mode.PRIVATE)
    add(fillet_2_piece_4, mode=Mode.SUBTRACT)


solid = part.part
